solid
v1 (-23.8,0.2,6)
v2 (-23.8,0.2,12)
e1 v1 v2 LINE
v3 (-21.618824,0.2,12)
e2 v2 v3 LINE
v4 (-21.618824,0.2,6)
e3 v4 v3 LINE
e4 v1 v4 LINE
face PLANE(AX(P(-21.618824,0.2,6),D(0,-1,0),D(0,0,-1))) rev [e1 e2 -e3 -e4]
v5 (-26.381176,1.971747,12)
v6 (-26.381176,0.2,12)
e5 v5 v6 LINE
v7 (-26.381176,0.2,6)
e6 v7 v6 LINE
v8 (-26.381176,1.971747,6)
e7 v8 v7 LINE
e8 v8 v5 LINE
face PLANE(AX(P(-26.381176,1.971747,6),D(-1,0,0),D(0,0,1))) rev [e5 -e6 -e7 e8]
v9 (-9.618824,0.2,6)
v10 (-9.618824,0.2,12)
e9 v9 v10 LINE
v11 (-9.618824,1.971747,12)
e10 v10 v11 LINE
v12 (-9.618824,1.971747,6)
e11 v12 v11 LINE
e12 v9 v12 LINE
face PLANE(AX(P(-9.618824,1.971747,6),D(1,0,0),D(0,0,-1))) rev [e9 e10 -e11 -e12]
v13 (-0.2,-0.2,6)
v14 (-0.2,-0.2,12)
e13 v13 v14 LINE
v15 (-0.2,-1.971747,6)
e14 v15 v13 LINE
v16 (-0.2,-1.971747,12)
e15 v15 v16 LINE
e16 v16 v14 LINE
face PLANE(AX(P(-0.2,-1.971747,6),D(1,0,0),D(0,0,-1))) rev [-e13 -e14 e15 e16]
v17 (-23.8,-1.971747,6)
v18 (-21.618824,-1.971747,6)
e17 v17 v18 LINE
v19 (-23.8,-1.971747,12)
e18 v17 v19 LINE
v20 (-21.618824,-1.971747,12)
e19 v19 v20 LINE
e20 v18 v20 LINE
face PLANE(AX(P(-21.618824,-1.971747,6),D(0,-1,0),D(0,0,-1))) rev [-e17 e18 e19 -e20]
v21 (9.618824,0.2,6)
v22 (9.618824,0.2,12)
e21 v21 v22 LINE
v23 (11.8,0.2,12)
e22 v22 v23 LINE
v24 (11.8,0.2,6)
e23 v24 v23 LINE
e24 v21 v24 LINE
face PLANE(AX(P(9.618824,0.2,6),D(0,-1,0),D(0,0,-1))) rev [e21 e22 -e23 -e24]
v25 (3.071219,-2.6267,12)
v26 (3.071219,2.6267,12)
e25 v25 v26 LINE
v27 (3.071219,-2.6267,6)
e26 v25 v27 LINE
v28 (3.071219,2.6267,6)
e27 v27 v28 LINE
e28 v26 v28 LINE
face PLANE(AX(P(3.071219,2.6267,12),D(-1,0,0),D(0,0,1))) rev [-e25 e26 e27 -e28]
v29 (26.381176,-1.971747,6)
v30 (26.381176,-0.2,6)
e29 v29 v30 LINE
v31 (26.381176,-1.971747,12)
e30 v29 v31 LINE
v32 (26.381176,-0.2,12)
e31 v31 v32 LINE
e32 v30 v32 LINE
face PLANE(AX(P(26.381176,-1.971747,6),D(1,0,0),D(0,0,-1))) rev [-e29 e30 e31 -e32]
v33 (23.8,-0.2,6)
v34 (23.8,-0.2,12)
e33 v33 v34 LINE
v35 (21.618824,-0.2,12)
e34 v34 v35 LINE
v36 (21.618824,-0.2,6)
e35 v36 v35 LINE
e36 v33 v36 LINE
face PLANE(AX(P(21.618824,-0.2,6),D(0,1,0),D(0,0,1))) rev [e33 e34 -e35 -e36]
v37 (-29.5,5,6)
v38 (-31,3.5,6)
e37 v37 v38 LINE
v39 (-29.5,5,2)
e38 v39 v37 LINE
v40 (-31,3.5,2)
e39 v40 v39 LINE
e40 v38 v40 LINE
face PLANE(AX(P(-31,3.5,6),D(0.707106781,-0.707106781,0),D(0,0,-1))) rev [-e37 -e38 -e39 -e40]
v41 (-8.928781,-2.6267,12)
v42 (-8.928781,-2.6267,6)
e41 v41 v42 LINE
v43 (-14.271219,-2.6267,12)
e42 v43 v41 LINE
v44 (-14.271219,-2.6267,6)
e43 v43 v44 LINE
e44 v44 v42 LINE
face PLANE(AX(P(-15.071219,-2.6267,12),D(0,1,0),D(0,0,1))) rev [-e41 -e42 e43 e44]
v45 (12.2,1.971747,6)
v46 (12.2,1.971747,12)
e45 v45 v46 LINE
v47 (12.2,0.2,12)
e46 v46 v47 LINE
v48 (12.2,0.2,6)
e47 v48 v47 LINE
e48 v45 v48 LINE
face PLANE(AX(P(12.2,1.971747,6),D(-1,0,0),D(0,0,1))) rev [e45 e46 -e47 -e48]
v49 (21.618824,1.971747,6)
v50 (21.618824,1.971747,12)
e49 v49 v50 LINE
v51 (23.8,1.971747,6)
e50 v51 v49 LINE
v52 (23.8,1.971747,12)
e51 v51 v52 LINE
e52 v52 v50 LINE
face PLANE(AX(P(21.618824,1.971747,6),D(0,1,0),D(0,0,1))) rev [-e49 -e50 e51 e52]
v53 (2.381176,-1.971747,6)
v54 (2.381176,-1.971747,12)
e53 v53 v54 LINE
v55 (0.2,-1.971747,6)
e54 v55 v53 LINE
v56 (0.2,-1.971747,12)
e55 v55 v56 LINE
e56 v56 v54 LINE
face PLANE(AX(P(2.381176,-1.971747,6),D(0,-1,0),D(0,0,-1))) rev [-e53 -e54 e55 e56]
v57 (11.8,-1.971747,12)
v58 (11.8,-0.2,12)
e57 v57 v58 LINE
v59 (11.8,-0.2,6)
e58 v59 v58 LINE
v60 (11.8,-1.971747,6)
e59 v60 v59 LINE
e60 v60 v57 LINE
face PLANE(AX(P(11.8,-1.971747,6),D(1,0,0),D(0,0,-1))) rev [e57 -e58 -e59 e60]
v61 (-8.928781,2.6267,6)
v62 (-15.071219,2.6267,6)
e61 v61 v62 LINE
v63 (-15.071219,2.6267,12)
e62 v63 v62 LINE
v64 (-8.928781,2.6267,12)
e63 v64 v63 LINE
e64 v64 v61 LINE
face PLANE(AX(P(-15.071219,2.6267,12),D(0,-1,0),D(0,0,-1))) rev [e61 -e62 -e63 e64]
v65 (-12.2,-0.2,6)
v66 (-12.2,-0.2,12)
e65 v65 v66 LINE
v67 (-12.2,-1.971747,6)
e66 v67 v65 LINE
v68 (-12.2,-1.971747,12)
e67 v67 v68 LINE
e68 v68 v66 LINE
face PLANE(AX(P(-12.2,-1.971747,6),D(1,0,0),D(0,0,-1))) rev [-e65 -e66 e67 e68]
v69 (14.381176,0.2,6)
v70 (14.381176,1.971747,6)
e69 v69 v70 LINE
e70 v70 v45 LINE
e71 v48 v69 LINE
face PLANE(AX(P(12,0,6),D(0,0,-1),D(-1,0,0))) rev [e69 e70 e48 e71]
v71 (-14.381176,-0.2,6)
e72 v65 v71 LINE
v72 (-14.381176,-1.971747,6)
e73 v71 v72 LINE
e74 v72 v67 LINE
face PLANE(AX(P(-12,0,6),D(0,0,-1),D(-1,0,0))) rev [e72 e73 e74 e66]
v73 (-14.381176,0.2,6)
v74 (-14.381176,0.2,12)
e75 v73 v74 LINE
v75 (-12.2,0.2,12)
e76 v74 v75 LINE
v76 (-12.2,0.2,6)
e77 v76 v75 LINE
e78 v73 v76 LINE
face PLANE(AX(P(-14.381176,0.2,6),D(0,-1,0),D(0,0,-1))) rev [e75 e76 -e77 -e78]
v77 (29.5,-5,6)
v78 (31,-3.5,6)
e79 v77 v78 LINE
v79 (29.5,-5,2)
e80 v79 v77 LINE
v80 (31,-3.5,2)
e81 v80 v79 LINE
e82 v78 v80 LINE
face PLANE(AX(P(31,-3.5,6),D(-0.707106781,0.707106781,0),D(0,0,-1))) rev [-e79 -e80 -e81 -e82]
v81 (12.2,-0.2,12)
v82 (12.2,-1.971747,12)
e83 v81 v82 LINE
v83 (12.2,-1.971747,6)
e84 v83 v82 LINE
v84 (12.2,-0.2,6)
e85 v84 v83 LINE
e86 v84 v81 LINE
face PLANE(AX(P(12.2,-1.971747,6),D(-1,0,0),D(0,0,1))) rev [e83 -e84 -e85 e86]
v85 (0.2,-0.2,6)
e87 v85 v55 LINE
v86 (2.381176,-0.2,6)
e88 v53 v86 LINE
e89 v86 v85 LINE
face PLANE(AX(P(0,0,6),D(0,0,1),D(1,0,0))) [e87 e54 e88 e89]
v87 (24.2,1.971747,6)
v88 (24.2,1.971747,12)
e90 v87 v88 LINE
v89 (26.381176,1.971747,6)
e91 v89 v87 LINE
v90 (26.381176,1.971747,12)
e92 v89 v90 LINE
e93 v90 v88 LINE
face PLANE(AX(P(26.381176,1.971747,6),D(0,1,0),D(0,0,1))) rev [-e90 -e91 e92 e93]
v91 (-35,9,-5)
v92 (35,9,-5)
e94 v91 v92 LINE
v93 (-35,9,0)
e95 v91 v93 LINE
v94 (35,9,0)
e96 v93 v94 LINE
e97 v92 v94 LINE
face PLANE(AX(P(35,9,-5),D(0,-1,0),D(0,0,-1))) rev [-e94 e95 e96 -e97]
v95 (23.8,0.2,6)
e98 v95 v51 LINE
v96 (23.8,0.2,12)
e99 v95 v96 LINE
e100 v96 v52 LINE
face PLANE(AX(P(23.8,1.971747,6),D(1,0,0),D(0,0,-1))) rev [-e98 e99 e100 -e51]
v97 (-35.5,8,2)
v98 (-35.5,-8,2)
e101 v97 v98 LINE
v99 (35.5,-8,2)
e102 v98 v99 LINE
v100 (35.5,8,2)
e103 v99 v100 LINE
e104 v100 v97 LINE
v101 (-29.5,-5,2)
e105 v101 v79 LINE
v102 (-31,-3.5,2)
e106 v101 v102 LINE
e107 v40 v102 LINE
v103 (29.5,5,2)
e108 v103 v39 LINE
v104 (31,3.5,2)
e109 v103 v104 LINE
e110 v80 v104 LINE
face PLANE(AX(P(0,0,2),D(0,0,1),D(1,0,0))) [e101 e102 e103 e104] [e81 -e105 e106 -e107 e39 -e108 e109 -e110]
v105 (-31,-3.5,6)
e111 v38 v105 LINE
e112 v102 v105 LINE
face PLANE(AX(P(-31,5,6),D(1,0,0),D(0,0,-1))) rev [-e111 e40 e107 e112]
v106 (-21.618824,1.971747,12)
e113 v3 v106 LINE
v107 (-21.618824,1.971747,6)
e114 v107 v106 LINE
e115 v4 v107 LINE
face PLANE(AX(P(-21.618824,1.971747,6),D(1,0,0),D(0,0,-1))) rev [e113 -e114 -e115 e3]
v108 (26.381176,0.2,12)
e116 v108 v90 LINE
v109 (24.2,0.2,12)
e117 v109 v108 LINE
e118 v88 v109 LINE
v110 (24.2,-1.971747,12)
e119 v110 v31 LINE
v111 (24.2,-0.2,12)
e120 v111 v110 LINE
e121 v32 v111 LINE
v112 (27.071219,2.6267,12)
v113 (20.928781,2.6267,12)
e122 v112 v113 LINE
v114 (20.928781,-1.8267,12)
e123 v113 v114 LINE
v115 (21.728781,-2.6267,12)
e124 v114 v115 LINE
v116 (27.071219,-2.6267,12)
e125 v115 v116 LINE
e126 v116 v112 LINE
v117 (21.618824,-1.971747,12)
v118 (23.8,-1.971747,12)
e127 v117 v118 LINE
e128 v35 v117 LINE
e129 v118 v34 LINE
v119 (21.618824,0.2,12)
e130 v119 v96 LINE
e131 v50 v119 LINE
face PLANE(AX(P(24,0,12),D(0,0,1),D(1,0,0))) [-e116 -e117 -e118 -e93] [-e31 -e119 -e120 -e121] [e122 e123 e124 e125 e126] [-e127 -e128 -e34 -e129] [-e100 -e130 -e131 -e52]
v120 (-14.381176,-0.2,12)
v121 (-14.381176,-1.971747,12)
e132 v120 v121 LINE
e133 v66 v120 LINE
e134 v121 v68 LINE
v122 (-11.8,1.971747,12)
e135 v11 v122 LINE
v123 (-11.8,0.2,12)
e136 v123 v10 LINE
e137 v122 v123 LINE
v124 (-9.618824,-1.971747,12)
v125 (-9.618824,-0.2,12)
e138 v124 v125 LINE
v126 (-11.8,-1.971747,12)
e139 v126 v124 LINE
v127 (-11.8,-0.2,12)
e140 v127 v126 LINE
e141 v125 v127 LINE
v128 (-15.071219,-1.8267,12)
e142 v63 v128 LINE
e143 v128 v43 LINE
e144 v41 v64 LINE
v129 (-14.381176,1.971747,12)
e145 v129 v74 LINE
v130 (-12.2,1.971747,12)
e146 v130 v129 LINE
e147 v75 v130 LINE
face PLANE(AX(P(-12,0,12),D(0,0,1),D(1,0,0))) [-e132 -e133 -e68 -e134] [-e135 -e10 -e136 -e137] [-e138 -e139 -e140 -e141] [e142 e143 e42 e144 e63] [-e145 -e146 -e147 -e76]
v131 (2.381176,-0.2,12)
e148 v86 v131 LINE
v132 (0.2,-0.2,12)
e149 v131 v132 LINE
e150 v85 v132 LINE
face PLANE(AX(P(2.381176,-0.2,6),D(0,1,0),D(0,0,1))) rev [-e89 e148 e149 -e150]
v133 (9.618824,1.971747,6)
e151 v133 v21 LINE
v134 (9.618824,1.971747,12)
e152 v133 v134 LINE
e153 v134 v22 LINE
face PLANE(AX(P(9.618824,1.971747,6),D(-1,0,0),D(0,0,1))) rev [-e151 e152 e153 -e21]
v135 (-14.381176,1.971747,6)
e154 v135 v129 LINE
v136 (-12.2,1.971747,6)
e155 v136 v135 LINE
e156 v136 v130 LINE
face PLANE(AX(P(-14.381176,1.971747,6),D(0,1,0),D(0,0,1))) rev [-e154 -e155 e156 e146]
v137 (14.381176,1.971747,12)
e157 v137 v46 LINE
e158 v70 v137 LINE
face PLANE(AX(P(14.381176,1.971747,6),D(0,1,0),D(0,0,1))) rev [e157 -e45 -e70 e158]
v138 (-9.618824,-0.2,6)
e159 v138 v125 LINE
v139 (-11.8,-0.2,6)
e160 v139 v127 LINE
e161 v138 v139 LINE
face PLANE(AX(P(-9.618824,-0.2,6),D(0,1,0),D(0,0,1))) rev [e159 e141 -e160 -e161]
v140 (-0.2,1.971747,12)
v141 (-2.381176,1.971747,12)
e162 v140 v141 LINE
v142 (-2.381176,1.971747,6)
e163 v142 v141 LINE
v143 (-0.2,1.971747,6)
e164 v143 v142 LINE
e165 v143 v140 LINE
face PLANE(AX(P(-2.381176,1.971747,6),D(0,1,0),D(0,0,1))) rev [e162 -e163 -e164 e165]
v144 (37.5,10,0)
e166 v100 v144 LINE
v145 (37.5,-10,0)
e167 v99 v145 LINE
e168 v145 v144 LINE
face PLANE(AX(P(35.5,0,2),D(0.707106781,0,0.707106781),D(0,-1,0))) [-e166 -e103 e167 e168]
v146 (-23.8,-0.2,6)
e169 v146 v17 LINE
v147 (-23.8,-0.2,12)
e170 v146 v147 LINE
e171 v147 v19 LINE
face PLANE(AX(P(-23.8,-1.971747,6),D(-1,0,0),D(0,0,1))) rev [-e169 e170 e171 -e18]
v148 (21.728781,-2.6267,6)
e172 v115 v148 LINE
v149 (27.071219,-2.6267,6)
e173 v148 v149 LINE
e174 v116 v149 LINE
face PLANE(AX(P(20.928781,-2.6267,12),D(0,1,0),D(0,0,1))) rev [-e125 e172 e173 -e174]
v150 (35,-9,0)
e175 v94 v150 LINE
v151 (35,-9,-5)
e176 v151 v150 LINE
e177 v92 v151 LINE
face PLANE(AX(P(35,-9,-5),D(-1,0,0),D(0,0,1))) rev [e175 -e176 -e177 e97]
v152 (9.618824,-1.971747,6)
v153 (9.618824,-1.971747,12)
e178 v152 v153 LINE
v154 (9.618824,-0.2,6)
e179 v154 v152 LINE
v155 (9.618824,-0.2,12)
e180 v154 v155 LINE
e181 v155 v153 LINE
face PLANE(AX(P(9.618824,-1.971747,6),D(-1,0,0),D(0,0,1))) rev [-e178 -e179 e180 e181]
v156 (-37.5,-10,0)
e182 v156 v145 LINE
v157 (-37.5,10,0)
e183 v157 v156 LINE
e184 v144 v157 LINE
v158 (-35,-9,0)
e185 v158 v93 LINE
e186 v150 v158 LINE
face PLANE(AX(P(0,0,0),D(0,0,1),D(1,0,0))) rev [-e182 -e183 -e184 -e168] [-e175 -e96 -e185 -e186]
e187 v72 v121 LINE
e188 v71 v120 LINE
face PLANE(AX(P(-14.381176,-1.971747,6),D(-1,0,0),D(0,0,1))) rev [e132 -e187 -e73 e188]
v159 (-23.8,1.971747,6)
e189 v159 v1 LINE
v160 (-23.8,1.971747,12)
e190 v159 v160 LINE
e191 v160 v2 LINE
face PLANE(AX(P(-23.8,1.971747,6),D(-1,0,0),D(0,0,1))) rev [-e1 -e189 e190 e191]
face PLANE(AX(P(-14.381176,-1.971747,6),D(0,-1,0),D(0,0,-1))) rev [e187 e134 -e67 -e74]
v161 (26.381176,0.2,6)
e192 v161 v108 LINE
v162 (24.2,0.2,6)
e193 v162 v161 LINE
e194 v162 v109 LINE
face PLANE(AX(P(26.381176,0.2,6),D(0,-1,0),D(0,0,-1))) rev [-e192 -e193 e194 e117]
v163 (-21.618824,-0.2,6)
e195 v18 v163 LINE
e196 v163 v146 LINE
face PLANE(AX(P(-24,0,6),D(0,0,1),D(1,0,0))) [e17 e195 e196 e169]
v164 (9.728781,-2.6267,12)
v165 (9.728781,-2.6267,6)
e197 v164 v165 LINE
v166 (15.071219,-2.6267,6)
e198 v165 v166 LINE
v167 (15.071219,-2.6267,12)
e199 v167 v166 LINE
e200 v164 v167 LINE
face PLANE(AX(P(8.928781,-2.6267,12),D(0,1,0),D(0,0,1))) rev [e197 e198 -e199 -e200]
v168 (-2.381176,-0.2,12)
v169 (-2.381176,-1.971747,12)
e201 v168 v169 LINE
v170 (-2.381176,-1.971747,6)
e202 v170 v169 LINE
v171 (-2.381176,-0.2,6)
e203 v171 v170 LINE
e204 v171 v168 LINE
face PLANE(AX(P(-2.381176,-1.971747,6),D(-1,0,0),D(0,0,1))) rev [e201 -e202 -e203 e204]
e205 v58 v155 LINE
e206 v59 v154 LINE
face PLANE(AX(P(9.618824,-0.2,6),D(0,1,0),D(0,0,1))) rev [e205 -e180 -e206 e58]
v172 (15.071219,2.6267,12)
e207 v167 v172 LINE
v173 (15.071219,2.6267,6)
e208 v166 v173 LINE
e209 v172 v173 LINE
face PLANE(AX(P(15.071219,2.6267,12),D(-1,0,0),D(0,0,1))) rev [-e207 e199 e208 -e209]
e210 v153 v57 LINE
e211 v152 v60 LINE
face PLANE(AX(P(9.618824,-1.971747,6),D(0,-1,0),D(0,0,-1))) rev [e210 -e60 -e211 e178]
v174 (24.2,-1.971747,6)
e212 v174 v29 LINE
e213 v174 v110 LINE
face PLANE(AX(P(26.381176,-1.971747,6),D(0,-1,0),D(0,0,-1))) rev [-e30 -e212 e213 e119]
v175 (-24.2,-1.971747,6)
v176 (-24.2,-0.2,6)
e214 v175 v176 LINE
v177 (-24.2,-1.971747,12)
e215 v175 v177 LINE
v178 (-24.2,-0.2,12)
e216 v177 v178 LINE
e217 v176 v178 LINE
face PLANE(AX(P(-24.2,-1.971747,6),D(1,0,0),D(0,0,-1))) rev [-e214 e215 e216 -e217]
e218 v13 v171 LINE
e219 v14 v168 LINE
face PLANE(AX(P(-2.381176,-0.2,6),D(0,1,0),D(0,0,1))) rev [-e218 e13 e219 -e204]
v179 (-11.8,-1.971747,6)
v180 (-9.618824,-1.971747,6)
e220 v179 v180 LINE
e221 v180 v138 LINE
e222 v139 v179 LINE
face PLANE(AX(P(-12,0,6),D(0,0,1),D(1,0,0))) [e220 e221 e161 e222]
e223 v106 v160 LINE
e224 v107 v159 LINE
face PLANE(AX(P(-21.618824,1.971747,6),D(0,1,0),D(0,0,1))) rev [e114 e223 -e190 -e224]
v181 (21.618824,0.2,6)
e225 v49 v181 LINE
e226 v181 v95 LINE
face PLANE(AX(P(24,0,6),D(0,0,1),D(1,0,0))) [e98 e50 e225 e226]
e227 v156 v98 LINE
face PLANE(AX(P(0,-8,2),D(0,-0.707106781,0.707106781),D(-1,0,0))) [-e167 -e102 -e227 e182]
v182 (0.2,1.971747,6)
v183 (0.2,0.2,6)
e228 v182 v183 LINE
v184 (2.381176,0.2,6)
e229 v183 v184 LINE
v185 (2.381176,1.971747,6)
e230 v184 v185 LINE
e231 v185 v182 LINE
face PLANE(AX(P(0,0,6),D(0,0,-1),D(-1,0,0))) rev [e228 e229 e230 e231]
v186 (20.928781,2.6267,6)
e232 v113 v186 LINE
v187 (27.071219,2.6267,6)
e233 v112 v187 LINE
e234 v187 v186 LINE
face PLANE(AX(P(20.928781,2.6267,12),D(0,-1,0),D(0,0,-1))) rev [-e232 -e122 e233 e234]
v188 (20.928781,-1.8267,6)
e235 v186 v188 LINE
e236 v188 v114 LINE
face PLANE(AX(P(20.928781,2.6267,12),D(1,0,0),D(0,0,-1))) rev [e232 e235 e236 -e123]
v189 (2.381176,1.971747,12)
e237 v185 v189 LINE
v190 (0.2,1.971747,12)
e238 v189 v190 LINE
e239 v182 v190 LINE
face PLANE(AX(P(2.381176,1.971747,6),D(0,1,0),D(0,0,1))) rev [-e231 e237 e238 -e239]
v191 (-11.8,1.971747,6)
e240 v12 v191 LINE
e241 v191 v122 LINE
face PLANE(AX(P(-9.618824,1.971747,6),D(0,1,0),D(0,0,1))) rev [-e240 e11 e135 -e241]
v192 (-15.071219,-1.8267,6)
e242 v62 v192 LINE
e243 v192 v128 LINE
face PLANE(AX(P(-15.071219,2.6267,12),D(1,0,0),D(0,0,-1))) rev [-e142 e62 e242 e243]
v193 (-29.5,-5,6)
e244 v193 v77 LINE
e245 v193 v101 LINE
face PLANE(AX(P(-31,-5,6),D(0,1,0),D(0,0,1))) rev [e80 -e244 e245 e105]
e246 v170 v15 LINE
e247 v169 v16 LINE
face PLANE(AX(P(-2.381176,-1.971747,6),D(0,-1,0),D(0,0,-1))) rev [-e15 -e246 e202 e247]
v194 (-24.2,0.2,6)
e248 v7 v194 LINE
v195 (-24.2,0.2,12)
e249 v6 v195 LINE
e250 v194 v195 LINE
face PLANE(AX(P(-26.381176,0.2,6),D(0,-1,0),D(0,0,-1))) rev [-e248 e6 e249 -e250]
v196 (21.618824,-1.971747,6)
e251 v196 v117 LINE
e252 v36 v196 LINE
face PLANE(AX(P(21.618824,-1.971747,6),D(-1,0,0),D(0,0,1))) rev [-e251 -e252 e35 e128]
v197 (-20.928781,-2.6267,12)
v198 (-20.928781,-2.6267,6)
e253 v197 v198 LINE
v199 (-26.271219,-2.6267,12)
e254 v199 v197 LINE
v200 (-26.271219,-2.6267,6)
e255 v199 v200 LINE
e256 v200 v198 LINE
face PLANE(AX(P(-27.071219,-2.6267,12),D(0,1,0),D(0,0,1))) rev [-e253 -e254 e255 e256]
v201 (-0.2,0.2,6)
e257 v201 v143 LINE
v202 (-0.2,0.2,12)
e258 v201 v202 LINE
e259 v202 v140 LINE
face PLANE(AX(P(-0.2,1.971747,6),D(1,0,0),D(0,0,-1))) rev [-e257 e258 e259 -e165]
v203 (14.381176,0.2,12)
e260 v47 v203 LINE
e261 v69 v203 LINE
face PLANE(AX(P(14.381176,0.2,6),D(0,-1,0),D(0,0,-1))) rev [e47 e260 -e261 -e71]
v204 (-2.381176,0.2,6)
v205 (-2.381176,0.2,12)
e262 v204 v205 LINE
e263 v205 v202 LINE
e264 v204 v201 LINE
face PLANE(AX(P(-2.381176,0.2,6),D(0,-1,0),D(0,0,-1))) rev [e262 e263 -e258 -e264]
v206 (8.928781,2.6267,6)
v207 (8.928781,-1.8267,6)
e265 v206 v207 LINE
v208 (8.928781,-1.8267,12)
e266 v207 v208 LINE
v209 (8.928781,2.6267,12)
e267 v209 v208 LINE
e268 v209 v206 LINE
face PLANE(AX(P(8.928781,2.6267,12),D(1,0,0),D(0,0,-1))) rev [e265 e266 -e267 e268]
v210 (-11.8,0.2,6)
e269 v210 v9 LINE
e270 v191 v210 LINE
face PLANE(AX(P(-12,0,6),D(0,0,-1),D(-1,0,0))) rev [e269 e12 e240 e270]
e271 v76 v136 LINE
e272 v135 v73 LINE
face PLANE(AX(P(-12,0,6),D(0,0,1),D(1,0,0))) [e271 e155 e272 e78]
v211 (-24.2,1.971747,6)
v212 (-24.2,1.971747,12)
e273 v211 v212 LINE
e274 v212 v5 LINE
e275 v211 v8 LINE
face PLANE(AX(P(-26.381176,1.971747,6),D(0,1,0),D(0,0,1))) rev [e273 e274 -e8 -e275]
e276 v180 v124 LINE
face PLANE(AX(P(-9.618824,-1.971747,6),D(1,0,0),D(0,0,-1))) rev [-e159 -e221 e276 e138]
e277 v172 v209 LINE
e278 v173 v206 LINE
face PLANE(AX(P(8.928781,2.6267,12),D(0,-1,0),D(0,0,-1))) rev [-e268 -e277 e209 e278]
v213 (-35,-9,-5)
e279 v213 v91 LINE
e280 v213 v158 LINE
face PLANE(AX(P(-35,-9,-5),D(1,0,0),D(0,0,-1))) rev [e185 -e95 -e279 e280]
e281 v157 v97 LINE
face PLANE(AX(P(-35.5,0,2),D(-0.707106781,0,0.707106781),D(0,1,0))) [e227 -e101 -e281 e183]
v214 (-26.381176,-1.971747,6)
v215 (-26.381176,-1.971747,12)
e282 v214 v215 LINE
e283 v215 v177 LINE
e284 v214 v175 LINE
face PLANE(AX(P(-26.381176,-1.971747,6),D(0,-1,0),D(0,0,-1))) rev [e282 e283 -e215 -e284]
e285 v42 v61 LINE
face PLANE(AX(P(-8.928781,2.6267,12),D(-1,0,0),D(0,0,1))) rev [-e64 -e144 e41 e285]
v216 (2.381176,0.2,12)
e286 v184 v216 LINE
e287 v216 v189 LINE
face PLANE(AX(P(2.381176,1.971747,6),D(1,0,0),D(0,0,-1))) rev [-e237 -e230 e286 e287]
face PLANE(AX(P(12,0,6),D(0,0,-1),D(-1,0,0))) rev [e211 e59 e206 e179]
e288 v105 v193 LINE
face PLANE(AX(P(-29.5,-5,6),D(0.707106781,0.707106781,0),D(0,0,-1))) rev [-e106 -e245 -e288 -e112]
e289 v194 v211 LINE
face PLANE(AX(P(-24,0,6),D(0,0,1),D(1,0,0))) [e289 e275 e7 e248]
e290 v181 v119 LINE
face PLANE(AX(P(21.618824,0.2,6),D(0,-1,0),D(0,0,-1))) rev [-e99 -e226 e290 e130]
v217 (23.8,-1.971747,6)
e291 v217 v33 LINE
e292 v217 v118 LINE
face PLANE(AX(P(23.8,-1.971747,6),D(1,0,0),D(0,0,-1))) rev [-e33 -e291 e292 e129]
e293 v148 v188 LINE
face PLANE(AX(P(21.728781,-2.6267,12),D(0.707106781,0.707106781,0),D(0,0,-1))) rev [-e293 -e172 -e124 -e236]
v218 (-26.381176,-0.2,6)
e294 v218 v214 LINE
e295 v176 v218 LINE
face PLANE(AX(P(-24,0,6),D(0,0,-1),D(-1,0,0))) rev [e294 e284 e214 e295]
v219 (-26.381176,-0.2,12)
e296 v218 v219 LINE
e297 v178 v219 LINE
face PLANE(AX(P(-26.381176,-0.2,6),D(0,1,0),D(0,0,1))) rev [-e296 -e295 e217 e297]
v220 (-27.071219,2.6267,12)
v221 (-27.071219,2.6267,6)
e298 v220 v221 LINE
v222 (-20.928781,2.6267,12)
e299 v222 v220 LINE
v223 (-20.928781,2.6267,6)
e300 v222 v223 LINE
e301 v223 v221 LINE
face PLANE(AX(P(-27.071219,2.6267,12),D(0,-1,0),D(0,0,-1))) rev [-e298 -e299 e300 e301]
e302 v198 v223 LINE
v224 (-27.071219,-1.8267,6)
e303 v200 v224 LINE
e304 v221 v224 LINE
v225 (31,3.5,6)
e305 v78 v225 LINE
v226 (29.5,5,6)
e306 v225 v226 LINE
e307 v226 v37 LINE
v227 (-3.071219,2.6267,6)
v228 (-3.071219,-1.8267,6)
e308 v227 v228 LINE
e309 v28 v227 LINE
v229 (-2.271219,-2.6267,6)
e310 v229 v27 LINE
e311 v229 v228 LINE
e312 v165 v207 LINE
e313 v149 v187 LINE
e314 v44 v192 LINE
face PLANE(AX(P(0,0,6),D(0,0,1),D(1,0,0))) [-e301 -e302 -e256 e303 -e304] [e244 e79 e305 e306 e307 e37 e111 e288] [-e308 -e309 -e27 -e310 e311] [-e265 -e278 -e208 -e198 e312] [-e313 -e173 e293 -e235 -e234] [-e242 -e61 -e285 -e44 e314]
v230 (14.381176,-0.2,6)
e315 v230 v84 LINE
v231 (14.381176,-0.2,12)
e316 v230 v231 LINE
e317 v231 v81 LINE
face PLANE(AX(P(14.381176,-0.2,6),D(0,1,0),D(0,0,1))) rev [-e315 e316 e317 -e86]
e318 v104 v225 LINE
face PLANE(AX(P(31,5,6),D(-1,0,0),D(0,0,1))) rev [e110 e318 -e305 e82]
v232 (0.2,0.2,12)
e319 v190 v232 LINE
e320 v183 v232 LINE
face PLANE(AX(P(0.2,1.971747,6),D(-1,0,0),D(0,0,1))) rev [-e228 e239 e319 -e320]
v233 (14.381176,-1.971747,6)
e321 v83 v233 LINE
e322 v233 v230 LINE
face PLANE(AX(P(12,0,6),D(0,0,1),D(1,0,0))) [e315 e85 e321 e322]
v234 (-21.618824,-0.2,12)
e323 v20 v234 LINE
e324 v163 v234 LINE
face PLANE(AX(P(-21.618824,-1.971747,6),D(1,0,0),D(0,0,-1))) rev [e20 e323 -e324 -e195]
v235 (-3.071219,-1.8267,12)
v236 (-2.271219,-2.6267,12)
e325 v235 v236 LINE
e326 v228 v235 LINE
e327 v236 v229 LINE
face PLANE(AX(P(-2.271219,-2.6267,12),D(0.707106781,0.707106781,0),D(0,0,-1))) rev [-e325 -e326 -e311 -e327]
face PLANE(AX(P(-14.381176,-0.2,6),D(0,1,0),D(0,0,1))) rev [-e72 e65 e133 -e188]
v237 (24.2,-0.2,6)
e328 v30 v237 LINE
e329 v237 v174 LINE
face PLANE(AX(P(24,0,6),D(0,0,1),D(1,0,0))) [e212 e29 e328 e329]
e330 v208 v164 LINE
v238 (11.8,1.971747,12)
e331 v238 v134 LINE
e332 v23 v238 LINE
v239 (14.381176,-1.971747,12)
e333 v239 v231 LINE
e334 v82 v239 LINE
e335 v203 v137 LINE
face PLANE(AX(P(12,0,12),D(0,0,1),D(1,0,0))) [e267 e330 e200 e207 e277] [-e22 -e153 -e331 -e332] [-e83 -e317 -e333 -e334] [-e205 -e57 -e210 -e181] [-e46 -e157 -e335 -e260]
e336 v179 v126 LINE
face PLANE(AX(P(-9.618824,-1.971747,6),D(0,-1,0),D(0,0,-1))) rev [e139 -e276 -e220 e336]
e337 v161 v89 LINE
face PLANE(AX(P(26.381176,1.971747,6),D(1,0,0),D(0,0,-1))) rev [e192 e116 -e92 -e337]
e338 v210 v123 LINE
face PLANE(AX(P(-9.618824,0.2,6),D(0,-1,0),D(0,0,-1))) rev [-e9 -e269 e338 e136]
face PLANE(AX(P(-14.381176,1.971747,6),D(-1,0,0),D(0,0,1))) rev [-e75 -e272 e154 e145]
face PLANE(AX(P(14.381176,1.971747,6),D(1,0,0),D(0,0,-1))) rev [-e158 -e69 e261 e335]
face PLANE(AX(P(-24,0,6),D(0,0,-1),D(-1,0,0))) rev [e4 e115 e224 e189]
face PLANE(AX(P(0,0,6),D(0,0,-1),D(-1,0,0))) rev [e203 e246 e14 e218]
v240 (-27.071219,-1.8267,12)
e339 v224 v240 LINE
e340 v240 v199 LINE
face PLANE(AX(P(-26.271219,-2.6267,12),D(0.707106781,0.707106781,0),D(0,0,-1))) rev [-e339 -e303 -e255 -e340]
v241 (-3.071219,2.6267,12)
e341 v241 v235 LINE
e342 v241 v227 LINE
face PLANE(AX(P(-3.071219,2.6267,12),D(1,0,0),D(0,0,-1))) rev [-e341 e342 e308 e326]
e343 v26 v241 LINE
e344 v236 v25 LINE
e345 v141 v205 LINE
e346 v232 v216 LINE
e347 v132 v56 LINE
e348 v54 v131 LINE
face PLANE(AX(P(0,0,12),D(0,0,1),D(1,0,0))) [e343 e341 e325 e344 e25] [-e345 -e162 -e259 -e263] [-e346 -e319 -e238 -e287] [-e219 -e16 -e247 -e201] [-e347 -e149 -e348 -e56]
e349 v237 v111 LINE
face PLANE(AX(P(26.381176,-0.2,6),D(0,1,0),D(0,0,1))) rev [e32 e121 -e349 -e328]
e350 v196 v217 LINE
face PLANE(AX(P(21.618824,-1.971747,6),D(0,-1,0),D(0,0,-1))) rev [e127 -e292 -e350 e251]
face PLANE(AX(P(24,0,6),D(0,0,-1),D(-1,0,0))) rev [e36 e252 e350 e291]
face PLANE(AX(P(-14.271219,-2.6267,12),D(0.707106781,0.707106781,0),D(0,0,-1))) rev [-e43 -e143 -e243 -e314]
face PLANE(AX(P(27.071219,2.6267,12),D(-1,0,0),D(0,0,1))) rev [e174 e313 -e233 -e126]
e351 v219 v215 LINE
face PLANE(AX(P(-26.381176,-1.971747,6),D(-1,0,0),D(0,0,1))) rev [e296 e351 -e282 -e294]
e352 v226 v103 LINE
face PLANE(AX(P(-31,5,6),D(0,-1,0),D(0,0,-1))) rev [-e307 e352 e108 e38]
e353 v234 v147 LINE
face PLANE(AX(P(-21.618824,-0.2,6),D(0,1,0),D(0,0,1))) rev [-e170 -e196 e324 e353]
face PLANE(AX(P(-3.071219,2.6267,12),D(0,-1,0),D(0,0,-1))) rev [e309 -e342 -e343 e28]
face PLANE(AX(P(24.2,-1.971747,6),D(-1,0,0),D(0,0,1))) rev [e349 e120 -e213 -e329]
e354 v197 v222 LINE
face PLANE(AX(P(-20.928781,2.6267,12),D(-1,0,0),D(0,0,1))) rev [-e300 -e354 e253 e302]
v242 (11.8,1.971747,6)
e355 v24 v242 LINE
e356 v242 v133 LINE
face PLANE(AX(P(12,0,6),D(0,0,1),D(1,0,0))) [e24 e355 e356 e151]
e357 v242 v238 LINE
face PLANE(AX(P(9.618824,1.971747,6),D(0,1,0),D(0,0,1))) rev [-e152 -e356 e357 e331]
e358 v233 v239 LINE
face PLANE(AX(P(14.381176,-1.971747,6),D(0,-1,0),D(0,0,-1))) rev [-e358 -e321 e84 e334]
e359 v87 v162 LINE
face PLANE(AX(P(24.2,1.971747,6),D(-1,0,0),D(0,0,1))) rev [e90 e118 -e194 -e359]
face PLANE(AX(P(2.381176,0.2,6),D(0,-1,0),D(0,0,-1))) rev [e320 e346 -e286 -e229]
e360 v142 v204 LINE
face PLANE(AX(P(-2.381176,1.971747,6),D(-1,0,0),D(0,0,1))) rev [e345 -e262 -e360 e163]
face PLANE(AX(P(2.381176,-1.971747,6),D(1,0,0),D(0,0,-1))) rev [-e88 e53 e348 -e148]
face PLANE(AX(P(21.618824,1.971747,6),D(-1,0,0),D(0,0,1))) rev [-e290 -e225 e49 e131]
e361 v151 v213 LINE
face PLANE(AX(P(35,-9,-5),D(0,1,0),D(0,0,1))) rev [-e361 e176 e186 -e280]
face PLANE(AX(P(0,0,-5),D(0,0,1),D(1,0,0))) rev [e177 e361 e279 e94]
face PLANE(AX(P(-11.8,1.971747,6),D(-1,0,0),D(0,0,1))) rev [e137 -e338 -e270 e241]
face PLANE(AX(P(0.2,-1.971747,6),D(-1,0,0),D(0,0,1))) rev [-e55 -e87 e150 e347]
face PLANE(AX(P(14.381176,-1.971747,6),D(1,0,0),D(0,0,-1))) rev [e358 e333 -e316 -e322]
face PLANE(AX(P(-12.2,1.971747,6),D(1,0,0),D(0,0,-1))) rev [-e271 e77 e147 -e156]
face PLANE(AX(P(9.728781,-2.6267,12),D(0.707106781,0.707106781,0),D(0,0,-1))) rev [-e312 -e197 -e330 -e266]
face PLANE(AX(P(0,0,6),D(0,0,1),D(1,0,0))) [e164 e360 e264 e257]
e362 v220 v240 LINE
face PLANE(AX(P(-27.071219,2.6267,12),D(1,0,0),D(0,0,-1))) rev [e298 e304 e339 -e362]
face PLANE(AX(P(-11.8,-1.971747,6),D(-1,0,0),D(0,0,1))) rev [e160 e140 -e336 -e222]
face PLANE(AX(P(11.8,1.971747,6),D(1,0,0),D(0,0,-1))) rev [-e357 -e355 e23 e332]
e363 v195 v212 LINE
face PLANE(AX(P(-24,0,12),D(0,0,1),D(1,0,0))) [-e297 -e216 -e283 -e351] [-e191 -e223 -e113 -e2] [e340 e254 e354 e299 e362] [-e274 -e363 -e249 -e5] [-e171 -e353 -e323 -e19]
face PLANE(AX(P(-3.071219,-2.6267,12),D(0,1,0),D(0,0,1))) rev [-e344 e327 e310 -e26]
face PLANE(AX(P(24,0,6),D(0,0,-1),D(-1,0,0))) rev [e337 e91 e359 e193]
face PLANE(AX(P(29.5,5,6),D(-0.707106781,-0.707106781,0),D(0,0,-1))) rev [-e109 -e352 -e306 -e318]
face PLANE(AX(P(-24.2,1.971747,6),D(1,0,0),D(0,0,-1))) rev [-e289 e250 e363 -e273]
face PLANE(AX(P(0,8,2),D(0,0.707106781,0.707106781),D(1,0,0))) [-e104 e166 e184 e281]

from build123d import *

# Parameters (mm, degrees)
SKETCH1_W            = 75
SKETCH1_H            = 20
BOSS_EXTRUDE1_DEPTH  = 2
SKETCH2_W            = 62
SKETCH2_H            = 10
BOSS_EXTRUDE2_DEPTH  = 4
SKETCH3_W            = 70
SKETCH3_H            = 18
BOSS_EXTRUDE3_DEPTH  = 5
SKETCH4_W            = 6.142437882
SKETCH4_H            = 5.25340082
BOSS_EXTRUDE4_DEPTH  = 6
SKETCH6_W            = 2.181176029
SKETCH6_H            = 1.77174688
CUT_EXTRUDE1_DEPTH   = 6
LPATTERN1_COUNT      = 3
LPATTERN1_PITCH      = 12
LPATTERN1_COUNT_DIR2 = 3
LPATTERN1_PITCH_DIR2 = 12
CHAMFER1_SIZE        = 0.8
CHAMFER2_SIZE        = 1.5
CHAMFER4_SIZE        = 2


with BuildPart() as part:
    # Sketch1 → Boss-Extrude1 (new body)
    with BuildSketch(Plane.XY):
        Rectangle(SKETCH1_W, SKETCH1_H)
    extrude(amount=BOSS_EXTRUDE1_DEPTH)

    # Sketch2 → Boss-Extrude2 (add)
    with BuildSketch(Plane.XY.offset(2)):
        Rectangle(SKETCH2_W, SKETCH2_H)
    extrude(amount=BOSS_EXTRUDE2_DEPTH)

    # Sketch3 → Boss-Extrude3 (add)
    with BuildSketch(Plane(origin=(0, 0, 0), x_dir=(-1, 0, 0), z_dir=(0, 0, -1))):
        Rectangle(SKETCH3_W, SKETCH3_H)
    extrude(amount=BOSS_EXTRUDE3_DEPTH)

    # Sketch4 → Boss-Extrude4 (add)
    with BuildSketch(Plane.XY.offset(6)):
        Rectangle(SKETCH4_W, SKETCH4_H)
    boss_extrude4 = extrude(amount=BOSS_EXTRUDE4_DEPTH)

    # Sketch6 → Cut-Extrude1 (cut)
    with BuildSketch(Plane.XY.offset(12)):
        with Locations((1.290588015, 1.08587344)):
            Rectangle(SKETCH6_W, SKETCH6_H)
        with Locations((-1.290588015, 1.08587344)):
            Rectangle(SKETCH6_W, SKETCH6_H)
        with Locations((-1.290588015, -1.08587344)):
            Rectangle(SKETCH6_W, SKETCH6_H)
        with Locations((1.290588015, -1.08587344)):
            Rectangle(SKETCH6_W, SKETCH6_H)
    cut_extrude1 = extrude(amount=-CUT_EXTRUDE1_DEPTH, mode=Mode.SUBTRACT)

    # LPattern1: Boss-Extrude4, Cut-Extrude1 3 × 3
    with Locations(*[Vector(1, 0, 0) * (i * LPATTERN1_PITCH) + Vector(-1, 0, 0) * (j * LPATTERN1_PITCH_DIR2) for i in range(LPATTERN1_COUNT) for j in range(LPATTERN1_COUNT_DIR2) if (i, j) != (0, 0)]):
        add(boss_extrude4)
        add(cut_extrude1, mode=Mode.SUBTRACT)

    # Chamfer1
    chamfer1_edges = [part.edges().sort_by_distance(p)[0] for p in [
        (-15.071218941, -2.62670041, 9),
        (-27.071218941, -2.62670041, 9),
        (8.928781059, -2.62670041, 9),
        (20.928781059, -2.62670041, 9),
        (-3.071218941, -2.62670041, 9),
    ]]
    chamfer(chamfer1_edges, length=CHAMFER1_SIZE)

    # Chamfer2
    chamfer2_edges = [part.edges().sort_by_distance(p)[0] for p in [
        (31, -5, 4),
        (31, 5, 4),
        (-31, 5, 4),
        (-31, -5, 4),
    ]]
    chamfer(chamfer2_edges, length=CHAMFER2_SIZE)

    # Chamfer4
    chamfer4_edges = [part.edges().sort_by_distance(p)[0] for p in [
        (0, 10, 2),
        (37.5, 0, 2),
        (0, -10, 2),
        (-37.5, 0, 2),
    ]]
    chamfer(chamfer4_edges, length=CHAMFER4_SIZE - 0.0001)  # a hair under: the kernel refuses the full size


solid = part.part
